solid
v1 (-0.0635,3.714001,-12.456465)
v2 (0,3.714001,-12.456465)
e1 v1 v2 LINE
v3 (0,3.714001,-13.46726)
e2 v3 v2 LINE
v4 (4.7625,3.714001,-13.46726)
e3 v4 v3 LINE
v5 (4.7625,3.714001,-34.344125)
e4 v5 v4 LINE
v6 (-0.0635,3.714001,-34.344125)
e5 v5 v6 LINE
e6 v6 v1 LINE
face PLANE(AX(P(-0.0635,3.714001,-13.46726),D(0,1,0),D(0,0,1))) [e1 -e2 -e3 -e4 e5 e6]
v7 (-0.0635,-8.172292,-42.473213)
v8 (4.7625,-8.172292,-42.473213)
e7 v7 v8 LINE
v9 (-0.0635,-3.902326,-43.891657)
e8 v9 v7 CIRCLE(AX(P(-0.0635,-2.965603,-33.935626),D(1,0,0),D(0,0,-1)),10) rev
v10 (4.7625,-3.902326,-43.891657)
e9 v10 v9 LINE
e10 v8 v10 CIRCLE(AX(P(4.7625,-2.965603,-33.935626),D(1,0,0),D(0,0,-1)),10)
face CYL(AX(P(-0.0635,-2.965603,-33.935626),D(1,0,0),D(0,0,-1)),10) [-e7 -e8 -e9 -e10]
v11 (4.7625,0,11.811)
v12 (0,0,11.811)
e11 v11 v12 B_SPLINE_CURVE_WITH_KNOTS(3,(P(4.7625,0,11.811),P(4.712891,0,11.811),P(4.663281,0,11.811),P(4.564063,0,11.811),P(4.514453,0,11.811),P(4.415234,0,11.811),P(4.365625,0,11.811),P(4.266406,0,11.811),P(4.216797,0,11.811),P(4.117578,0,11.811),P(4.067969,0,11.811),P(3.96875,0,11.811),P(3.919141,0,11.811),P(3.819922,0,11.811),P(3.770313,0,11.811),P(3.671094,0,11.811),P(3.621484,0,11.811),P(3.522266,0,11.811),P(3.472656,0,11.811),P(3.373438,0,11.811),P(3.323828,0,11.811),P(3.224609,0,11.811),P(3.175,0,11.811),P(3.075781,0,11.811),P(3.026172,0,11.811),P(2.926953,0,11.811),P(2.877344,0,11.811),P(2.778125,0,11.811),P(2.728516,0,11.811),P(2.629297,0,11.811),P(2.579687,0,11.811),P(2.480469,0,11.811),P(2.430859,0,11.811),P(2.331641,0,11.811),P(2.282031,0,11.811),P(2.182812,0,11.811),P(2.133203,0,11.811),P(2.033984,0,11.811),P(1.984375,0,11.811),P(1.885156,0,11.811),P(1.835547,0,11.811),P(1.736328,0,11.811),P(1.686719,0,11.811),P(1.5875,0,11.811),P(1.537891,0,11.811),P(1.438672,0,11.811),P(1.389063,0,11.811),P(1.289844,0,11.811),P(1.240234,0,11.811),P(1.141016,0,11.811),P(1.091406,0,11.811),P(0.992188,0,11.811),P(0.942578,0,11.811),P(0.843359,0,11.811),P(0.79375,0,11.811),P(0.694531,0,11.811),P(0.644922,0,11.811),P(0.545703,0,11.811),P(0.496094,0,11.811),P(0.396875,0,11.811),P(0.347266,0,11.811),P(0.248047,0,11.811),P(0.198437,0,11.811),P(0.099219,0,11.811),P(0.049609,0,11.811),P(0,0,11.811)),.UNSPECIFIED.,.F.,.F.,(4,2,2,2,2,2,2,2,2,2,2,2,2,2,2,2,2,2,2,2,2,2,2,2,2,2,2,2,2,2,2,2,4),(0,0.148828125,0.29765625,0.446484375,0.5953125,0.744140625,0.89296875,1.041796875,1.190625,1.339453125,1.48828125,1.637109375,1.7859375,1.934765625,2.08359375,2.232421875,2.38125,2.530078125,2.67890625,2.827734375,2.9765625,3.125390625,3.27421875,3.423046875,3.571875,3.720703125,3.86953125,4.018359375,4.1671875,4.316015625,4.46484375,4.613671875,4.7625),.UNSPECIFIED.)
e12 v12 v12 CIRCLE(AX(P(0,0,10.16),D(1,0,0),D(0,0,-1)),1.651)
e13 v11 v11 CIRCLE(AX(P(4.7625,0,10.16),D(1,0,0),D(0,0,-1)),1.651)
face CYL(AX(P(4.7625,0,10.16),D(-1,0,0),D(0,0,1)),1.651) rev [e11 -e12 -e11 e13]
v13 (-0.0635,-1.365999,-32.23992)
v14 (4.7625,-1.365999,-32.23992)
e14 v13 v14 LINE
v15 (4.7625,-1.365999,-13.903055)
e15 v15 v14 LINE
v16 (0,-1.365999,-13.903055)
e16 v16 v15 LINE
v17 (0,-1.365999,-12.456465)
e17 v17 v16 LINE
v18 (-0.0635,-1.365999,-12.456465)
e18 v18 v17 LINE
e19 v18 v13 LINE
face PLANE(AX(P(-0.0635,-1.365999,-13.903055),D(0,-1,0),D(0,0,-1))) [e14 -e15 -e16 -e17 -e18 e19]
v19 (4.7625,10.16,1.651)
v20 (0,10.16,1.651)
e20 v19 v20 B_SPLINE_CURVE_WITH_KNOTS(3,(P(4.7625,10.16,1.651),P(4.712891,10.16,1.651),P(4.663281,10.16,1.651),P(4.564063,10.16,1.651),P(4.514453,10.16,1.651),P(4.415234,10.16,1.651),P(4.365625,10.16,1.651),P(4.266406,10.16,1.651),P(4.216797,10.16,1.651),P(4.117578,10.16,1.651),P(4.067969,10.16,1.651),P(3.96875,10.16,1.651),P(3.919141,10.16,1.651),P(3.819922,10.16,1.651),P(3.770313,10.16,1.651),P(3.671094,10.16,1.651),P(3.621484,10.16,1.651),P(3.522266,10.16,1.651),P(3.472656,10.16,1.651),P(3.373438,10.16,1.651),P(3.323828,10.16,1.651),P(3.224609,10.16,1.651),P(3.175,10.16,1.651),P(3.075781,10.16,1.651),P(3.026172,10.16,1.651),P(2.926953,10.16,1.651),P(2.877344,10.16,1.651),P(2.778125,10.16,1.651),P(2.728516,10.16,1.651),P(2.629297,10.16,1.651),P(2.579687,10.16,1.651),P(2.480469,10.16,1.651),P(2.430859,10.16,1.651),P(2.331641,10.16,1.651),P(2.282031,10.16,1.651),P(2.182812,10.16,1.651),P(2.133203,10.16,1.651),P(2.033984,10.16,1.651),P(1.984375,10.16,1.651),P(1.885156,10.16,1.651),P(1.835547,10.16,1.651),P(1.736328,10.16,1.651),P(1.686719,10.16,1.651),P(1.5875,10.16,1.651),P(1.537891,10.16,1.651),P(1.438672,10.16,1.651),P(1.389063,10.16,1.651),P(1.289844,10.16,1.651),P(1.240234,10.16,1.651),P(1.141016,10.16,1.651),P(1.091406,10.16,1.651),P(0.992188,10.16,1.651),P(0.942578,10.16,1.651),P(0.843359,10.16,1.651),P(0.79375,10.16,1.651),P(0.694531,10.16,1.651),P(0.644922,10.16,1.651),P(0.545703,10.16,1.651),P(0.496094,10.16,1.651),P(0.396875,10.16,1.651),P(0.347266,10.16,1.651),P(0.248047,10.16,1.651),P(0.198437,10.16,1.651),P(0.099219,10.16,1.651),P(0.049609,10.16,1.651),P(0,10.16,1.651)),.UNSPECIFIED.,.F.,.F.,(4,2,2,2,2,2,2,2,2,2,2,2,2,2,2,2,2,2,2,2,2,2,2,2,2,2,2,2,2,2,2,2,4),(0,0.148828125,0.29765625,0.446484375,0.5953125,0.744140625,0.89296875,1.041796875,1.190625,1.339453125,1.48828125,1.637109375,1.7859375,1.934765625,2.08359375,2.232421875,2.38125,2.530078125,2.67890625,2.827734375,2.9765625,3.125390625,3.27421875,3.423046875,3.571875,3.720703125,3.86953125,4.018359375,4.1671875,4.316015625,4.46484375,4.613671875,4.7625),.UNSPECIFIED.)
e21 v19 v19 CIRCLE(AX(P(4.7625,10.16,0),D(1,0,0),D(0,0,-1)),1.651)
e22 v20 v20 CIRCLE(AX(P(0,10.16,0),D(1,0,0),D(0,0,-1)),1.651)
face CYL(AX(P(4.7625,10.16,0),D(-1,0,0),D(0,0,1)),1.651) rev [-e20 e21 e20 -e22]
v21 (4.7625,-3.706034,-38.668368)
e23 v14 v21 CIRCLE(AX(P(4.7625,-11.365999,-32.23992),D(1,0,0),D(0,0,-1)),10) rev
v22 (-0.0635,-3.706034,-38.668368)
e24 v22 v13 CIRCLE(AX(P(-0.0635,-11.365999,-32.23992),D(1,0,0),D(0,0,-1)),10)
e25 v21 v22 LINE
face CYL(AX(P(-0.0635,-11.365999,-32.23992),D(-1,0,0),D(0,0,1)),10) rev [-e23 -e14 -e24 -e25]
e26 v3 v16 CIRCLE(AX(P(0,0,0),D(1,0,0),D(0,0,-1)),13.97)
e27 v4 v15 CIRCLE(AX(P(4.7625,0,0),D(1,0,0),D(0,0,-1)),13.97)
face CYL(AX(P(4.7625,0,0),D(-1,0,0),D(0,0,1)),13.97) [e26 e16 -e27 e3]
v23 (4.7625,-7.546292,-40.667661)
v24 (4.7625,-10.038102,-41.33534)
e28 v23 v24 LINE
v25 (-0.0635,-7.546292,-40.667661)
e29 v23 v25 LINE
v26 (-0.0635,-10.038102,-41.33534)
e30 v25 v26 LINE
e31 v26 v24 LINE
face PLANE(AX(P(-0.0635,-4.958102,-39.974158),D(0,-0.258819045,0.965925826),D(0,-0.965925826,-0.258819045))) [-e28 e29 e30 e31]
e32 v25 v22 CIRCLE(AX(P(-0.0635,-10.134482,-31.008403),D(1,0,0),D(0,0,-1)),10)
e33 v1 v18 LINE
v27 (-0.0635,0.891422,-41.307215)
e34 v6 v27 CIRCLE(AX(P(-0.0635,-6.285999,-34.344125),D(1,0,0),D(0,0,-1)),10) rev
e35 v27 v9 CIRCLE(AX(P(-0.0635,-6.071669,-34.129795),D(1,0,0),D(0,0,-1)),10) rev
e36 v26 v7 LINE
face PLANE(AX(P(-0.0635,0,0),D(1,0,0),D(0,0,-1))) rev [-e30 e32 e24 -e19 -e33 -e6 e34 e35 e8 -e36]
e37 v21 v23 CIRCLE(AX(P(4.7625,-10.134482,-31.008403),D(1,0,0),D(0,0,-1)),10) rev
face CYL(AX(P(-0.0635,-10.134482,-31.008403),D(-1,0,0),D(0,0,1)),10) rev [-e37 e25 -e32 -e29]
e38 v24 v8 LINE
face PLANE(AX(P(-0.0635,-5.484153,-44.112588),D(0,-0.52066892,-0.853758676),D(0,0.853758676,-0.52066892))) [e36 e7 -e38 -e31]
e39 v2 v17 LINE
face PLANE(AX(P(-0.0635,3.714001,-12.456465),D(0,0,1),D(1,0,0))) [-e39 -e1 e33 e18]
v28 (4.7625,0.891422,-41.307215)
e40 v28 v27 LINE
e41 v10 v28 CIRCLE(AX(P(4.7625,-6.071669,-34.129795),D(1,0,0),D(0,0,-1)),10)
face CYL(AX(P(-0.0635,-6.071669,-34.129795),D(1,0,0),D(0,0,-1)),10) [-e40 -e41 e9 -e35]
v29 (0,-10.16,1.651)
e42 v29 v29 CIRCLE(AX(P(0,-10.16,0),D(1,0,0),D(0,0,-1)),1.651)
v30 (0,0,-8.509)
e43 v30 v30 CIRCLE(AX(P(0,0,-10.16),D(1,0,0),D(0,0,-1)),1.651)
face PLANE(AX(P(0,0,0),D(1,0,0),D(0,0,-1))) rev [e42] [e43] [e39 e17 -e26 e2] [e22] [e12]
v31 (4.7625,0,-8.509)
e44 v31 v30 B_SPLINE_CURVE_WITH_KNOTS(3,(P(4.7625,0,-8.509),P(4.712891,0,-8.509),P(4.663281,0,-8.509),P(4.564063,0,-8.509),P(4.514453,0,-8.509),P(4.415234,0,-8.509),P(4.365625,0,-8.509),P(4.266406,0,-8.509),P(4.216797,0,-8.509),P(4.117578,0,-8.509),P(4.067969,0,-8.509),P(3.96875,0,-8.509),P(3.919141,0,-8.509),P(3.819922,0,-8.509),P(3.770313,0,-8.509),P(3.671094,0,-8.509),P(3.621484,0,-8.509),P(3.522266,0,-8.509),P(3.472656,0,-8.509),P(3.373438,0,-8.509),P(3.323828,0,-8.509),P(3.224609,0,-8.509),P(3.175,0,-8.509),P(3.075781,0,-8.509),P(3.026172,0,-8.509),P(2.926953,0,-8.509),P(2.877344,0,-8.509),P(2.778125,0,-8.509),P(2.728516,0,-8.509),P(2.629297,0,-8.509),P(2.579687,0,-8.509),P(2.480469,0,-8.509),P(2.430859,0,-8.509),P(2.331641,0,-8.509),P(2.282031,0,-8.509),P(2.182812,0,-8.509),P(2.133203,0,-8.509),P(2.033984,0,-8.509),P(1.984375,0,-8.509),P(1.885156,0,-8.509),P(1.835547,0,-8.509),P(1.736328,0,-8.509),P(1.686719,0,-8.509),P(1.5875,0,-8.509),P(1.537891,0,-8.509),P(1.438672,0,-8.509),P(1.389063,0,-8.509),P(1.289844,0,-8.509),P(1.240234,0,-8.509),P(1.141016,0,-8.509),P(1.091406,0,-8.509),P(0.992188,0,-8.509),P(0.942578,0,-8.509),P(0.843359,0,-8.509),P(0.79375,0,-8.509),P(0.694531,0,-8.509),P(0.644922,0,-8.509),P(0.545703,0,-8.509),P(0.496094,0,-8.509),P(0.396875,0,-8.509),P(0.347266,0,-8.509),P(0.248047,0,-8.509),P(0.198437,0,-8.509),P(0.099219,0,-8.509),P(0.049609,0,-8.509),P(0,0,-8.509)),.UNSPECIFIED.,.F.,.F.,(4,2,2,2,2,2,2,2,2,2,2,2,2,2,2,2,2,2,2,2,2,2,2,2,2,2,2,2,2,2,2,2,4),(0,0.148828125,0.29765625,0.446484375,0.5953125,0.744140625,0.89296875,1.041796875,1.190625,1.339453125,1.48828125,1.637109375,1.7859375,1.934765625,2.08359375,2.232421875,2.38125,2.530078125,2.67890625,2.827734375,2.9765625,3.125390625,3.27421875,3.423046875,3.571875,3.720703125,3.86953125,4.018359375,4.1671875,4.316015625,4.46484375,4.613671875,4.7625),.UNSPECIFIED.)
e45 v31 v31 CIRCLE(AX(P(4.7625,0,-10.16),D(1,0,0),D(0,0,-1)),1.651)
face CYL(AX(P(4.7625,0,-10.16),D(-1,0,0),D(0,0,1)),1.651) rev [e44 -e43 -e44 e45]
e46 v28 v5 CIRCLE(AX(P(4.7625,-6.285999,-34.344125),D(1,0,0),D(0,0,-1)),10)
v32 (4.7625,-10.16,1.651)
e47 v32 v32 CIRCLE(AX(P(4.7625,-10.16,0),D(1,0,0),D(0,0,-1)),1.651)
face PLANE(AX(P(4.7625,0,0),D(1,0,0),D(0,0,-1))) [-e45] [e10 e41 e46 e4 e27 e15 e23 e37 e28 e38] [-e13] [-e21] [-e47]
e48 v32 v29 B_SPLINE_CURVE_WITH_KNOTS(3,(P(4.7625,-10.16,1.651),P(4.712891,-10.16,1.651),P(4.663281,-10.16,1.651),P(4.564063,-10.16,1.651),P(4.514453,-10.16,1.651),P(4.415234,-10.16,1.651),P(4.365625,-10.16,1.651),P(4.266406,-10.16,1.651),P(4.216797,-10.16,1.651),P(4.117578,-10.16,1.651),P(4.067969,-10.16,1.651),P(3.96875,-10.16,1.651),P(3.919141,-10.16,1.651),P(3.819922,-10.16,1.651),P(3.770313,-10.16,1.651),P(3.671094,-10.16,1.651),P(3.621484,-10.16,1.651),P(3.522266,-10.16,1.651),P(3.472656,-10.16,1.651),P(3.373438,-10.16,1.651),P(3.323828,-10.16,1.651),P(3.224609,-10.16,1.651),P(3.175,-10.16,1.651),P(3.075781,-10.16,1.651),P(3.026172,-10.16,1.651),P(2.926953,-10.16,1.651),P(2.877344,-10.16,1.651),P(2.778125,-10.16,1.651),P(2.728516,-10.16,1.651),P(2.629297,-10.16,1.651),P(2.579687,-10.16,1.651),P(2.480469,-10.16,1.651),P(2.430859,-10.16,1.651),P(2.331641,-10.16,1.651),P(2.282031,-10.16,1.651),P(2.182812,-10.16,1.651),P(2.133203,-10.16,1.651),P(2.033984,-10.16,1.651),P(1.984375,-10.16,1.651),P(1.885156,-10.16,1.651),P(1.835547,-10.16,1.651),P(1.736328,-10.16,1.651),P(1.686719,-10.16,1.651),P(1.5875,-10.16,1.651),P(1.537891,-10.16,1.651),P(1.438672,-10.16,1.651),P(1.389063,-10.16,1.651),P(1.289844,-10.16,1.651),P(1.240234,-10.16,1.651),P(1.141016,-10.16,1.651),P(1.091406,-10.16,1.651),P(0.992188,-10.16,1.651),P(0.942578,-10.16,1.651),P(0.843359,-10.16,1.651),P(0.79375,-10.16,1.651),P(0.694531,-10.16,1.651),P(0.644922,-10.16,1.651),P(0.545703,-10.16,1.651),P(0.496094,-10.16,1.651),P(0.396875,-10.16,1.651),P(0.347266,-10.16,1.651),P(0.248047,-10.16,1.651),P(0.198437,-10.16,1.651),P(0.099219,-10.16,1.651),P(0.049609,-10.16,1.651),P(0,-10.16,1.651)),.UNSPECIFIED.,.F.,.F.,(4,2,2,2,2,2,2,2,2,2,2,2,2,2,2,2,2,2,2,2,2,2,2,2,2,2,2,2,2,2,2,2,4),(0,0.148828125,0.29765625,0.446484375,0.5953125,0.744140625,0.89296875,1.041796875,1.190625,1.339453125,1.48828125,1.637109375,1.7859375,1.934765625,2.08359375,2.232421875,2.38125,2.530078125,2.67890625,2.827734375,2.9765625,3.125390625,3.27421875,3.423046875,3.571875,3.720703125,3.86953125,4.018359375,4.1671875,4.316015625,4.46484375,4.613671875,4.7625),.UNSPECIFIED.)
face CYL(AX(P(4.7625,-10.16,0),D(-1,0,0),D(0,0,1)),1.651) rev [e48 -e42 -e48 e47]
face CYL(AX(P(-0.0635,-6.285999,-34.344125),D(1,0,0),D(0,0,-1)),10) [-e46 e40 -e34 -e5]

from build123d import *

# Parameters (mm, degrees)
SKETCH1_R           = 13.97
SKETCH1_R_2         = 1.651
BOSS_EXTRUDE1_DEPTH = 4.7625
LEG1_DEPTH          = 4.826
FILLET2_R           = 10


with BuildPart() as part:
    # Sketch1 → Boss-Extrude1 (new body)
    with BuildSketch(Plane(origin=(0, 0, 0), x_dir=(0, 0, -1), z_dir=(1, 0, 0))):
        with Locations(Location((0, 0, 0), (0, 0, 180))):
            Circle(SKETCH1_R)
        with Locations(Location((-10.16, 0, 0), (0, 0, 180))):
            Circle(SKETCH1_R_2, mode=Mode.SUBTRACT)
        with Locations(Location((0, 10.16, 0), (0, 0, 180))):
            Circle(SKETCH1_R_2, mode=Mode.SUBTRACT)
        with Locations(Location((10.16, 0, 0), (0, 0, 180))):
            Circle(SKETCH1_R_2, mode=Mode.SUBTRACT)
        with Locations(Location((0, -10.16, 0), (0, 0, 180))):
            Circle(SKETCH1_R_2, mode=Mode.SUBTRACT)
    extrude(amount=BOSS_EXTRUDE1_DEPTH)

    # Sketch2 → leg1 (add)
    with BuildSketch(Plane(origin=(4.7625, 0, 0), x_dir=(0, 0, -1), z_dir=(1, 0, 0))):
        Polygon((13.467260192, 3.714000931), (38.486260192, 3.714000931), (43.874413865, -1.674152741), (44.112587658, -5.484152741), (41.335339641, -10.038101517), (39.974157744, -4.958101517), (36.382055295, -1.365999069), (13.903055295, -1.365999069), (12.45646463, -1.365999069), (12.45646463, 3.714000931), align=None)
    extrude(amount=-LEG1_DEPTH)

    # Fillet2
    # the kernel refuses this fillet: 10 mm, written as the material it adds along each edge
    with BuildSketch(Plane(origin=(4.7625, -4.958101517, -39.974157744), x_dir=(0, 0.7071067811865493, 0.7071067811865457), z_dir=(-1, 0, 0))) as fillet2_piece_1:
        with BuildLine():
            CenterArc((FILLET2_R * 0.267949192431, -FILLET2_R), FILLET2_R, 90, 30)
            Line((-FILLET2_R * 0.232050807569, -FILLET2_R * 0.133974596216), (0, 0))
            Line((0, 0), (FILLET2_R * 0.267949192431, 0))
        make_face()
    extrude(amount=4.826)
    with BuildSketch(Plane(origin=(4.7625, -1.365999069, -36.382055295), x_dir=(0, 0, 1), z_dir=(-1, 0, 0))) as fillet2_piece_2:
        with BuildLine():
            CenterArc((FILLET2_R * 0.414213562373, -FILLET2_R), FILLET2_R, 90, 45)
            Line((-FILLET2_R * 0.292893218813, -FILLET2_R * 0.292893218813), (0, 0))
            Line((0, 0), (FILLET2_R * 0.414213562373, 0))
        make_face()
    extrude(amount=4.826)
    # the kernel refuses this fillet: 10 mm, written as the material it takes off along each edge
    with BuildSketch(Plane(origin=(15.117839059, 3.714000931, -38.486260192), x_dir=(0, 0, 1), z_dir=(-1, 0, 0))) as fillet2_2_piece_1:
        with BuildLine():
            CenterArc((FILLET2_R * 0.414213562373, -FILLET2_R), FILLET2_R, 90, 45)
            Line((-FILLET2_R * 0.292893218813, -FILLET2_R * 0.292893218813), (0, 0))
            Line((0, 0), (FILLET2_R * 0.414213562373, 0))
        make_face()
    extrude(amount=25.536678119, mode=Mode.SUBTRACT)
    with BuildSketch(Plane(origin=(14.214931239, -1.674152741, -43.874413865), x_dir=(0, 0.707106781186548, 0.707106781186547), z_dir=(-1, 0, 0))) as fillet2_2_piece_2:
        with BuildLine():
            CenterArc((FILLET2_R * 0.378097249561, -FILLET2_R), FILLET2_R, 90, 41.422934713)
            Line((-FILLET2_R * 0.283514821921, -FILLET2_R * 0.250153704503), (0, 0))
            Line((0, 0), (FILLET2_R * 0.378097249561, 0))
        make_face()
    extrude(amount=23.730862478, mode=Mode.SUBTRACT)
    with BuildSketch(Plane(origin=(12.633985106, -5.484152741, -44.112587658), x_dir=(0, -0.853758675625452, 0.5206689195585562), z_dir=(-1, 0, 0))) as fillet2_2_piece_3:
        with BuildLine():
            CenterArc((FILLET2_R * 0.314859404258, FILLET2_R), FILLET2_R, 235.045802712, 34.954197288)
            Line((-FILLET2_R * 0.258062012092, FILLET2_R * 0.180389695839), (0, 0))
            Line((0, 0), (FILLET2_R * 0.314859404258, 0))
        make_face()
    extrude(amount=20.568970213, mode=Mode.SUBTRACT)


solid = part.part
